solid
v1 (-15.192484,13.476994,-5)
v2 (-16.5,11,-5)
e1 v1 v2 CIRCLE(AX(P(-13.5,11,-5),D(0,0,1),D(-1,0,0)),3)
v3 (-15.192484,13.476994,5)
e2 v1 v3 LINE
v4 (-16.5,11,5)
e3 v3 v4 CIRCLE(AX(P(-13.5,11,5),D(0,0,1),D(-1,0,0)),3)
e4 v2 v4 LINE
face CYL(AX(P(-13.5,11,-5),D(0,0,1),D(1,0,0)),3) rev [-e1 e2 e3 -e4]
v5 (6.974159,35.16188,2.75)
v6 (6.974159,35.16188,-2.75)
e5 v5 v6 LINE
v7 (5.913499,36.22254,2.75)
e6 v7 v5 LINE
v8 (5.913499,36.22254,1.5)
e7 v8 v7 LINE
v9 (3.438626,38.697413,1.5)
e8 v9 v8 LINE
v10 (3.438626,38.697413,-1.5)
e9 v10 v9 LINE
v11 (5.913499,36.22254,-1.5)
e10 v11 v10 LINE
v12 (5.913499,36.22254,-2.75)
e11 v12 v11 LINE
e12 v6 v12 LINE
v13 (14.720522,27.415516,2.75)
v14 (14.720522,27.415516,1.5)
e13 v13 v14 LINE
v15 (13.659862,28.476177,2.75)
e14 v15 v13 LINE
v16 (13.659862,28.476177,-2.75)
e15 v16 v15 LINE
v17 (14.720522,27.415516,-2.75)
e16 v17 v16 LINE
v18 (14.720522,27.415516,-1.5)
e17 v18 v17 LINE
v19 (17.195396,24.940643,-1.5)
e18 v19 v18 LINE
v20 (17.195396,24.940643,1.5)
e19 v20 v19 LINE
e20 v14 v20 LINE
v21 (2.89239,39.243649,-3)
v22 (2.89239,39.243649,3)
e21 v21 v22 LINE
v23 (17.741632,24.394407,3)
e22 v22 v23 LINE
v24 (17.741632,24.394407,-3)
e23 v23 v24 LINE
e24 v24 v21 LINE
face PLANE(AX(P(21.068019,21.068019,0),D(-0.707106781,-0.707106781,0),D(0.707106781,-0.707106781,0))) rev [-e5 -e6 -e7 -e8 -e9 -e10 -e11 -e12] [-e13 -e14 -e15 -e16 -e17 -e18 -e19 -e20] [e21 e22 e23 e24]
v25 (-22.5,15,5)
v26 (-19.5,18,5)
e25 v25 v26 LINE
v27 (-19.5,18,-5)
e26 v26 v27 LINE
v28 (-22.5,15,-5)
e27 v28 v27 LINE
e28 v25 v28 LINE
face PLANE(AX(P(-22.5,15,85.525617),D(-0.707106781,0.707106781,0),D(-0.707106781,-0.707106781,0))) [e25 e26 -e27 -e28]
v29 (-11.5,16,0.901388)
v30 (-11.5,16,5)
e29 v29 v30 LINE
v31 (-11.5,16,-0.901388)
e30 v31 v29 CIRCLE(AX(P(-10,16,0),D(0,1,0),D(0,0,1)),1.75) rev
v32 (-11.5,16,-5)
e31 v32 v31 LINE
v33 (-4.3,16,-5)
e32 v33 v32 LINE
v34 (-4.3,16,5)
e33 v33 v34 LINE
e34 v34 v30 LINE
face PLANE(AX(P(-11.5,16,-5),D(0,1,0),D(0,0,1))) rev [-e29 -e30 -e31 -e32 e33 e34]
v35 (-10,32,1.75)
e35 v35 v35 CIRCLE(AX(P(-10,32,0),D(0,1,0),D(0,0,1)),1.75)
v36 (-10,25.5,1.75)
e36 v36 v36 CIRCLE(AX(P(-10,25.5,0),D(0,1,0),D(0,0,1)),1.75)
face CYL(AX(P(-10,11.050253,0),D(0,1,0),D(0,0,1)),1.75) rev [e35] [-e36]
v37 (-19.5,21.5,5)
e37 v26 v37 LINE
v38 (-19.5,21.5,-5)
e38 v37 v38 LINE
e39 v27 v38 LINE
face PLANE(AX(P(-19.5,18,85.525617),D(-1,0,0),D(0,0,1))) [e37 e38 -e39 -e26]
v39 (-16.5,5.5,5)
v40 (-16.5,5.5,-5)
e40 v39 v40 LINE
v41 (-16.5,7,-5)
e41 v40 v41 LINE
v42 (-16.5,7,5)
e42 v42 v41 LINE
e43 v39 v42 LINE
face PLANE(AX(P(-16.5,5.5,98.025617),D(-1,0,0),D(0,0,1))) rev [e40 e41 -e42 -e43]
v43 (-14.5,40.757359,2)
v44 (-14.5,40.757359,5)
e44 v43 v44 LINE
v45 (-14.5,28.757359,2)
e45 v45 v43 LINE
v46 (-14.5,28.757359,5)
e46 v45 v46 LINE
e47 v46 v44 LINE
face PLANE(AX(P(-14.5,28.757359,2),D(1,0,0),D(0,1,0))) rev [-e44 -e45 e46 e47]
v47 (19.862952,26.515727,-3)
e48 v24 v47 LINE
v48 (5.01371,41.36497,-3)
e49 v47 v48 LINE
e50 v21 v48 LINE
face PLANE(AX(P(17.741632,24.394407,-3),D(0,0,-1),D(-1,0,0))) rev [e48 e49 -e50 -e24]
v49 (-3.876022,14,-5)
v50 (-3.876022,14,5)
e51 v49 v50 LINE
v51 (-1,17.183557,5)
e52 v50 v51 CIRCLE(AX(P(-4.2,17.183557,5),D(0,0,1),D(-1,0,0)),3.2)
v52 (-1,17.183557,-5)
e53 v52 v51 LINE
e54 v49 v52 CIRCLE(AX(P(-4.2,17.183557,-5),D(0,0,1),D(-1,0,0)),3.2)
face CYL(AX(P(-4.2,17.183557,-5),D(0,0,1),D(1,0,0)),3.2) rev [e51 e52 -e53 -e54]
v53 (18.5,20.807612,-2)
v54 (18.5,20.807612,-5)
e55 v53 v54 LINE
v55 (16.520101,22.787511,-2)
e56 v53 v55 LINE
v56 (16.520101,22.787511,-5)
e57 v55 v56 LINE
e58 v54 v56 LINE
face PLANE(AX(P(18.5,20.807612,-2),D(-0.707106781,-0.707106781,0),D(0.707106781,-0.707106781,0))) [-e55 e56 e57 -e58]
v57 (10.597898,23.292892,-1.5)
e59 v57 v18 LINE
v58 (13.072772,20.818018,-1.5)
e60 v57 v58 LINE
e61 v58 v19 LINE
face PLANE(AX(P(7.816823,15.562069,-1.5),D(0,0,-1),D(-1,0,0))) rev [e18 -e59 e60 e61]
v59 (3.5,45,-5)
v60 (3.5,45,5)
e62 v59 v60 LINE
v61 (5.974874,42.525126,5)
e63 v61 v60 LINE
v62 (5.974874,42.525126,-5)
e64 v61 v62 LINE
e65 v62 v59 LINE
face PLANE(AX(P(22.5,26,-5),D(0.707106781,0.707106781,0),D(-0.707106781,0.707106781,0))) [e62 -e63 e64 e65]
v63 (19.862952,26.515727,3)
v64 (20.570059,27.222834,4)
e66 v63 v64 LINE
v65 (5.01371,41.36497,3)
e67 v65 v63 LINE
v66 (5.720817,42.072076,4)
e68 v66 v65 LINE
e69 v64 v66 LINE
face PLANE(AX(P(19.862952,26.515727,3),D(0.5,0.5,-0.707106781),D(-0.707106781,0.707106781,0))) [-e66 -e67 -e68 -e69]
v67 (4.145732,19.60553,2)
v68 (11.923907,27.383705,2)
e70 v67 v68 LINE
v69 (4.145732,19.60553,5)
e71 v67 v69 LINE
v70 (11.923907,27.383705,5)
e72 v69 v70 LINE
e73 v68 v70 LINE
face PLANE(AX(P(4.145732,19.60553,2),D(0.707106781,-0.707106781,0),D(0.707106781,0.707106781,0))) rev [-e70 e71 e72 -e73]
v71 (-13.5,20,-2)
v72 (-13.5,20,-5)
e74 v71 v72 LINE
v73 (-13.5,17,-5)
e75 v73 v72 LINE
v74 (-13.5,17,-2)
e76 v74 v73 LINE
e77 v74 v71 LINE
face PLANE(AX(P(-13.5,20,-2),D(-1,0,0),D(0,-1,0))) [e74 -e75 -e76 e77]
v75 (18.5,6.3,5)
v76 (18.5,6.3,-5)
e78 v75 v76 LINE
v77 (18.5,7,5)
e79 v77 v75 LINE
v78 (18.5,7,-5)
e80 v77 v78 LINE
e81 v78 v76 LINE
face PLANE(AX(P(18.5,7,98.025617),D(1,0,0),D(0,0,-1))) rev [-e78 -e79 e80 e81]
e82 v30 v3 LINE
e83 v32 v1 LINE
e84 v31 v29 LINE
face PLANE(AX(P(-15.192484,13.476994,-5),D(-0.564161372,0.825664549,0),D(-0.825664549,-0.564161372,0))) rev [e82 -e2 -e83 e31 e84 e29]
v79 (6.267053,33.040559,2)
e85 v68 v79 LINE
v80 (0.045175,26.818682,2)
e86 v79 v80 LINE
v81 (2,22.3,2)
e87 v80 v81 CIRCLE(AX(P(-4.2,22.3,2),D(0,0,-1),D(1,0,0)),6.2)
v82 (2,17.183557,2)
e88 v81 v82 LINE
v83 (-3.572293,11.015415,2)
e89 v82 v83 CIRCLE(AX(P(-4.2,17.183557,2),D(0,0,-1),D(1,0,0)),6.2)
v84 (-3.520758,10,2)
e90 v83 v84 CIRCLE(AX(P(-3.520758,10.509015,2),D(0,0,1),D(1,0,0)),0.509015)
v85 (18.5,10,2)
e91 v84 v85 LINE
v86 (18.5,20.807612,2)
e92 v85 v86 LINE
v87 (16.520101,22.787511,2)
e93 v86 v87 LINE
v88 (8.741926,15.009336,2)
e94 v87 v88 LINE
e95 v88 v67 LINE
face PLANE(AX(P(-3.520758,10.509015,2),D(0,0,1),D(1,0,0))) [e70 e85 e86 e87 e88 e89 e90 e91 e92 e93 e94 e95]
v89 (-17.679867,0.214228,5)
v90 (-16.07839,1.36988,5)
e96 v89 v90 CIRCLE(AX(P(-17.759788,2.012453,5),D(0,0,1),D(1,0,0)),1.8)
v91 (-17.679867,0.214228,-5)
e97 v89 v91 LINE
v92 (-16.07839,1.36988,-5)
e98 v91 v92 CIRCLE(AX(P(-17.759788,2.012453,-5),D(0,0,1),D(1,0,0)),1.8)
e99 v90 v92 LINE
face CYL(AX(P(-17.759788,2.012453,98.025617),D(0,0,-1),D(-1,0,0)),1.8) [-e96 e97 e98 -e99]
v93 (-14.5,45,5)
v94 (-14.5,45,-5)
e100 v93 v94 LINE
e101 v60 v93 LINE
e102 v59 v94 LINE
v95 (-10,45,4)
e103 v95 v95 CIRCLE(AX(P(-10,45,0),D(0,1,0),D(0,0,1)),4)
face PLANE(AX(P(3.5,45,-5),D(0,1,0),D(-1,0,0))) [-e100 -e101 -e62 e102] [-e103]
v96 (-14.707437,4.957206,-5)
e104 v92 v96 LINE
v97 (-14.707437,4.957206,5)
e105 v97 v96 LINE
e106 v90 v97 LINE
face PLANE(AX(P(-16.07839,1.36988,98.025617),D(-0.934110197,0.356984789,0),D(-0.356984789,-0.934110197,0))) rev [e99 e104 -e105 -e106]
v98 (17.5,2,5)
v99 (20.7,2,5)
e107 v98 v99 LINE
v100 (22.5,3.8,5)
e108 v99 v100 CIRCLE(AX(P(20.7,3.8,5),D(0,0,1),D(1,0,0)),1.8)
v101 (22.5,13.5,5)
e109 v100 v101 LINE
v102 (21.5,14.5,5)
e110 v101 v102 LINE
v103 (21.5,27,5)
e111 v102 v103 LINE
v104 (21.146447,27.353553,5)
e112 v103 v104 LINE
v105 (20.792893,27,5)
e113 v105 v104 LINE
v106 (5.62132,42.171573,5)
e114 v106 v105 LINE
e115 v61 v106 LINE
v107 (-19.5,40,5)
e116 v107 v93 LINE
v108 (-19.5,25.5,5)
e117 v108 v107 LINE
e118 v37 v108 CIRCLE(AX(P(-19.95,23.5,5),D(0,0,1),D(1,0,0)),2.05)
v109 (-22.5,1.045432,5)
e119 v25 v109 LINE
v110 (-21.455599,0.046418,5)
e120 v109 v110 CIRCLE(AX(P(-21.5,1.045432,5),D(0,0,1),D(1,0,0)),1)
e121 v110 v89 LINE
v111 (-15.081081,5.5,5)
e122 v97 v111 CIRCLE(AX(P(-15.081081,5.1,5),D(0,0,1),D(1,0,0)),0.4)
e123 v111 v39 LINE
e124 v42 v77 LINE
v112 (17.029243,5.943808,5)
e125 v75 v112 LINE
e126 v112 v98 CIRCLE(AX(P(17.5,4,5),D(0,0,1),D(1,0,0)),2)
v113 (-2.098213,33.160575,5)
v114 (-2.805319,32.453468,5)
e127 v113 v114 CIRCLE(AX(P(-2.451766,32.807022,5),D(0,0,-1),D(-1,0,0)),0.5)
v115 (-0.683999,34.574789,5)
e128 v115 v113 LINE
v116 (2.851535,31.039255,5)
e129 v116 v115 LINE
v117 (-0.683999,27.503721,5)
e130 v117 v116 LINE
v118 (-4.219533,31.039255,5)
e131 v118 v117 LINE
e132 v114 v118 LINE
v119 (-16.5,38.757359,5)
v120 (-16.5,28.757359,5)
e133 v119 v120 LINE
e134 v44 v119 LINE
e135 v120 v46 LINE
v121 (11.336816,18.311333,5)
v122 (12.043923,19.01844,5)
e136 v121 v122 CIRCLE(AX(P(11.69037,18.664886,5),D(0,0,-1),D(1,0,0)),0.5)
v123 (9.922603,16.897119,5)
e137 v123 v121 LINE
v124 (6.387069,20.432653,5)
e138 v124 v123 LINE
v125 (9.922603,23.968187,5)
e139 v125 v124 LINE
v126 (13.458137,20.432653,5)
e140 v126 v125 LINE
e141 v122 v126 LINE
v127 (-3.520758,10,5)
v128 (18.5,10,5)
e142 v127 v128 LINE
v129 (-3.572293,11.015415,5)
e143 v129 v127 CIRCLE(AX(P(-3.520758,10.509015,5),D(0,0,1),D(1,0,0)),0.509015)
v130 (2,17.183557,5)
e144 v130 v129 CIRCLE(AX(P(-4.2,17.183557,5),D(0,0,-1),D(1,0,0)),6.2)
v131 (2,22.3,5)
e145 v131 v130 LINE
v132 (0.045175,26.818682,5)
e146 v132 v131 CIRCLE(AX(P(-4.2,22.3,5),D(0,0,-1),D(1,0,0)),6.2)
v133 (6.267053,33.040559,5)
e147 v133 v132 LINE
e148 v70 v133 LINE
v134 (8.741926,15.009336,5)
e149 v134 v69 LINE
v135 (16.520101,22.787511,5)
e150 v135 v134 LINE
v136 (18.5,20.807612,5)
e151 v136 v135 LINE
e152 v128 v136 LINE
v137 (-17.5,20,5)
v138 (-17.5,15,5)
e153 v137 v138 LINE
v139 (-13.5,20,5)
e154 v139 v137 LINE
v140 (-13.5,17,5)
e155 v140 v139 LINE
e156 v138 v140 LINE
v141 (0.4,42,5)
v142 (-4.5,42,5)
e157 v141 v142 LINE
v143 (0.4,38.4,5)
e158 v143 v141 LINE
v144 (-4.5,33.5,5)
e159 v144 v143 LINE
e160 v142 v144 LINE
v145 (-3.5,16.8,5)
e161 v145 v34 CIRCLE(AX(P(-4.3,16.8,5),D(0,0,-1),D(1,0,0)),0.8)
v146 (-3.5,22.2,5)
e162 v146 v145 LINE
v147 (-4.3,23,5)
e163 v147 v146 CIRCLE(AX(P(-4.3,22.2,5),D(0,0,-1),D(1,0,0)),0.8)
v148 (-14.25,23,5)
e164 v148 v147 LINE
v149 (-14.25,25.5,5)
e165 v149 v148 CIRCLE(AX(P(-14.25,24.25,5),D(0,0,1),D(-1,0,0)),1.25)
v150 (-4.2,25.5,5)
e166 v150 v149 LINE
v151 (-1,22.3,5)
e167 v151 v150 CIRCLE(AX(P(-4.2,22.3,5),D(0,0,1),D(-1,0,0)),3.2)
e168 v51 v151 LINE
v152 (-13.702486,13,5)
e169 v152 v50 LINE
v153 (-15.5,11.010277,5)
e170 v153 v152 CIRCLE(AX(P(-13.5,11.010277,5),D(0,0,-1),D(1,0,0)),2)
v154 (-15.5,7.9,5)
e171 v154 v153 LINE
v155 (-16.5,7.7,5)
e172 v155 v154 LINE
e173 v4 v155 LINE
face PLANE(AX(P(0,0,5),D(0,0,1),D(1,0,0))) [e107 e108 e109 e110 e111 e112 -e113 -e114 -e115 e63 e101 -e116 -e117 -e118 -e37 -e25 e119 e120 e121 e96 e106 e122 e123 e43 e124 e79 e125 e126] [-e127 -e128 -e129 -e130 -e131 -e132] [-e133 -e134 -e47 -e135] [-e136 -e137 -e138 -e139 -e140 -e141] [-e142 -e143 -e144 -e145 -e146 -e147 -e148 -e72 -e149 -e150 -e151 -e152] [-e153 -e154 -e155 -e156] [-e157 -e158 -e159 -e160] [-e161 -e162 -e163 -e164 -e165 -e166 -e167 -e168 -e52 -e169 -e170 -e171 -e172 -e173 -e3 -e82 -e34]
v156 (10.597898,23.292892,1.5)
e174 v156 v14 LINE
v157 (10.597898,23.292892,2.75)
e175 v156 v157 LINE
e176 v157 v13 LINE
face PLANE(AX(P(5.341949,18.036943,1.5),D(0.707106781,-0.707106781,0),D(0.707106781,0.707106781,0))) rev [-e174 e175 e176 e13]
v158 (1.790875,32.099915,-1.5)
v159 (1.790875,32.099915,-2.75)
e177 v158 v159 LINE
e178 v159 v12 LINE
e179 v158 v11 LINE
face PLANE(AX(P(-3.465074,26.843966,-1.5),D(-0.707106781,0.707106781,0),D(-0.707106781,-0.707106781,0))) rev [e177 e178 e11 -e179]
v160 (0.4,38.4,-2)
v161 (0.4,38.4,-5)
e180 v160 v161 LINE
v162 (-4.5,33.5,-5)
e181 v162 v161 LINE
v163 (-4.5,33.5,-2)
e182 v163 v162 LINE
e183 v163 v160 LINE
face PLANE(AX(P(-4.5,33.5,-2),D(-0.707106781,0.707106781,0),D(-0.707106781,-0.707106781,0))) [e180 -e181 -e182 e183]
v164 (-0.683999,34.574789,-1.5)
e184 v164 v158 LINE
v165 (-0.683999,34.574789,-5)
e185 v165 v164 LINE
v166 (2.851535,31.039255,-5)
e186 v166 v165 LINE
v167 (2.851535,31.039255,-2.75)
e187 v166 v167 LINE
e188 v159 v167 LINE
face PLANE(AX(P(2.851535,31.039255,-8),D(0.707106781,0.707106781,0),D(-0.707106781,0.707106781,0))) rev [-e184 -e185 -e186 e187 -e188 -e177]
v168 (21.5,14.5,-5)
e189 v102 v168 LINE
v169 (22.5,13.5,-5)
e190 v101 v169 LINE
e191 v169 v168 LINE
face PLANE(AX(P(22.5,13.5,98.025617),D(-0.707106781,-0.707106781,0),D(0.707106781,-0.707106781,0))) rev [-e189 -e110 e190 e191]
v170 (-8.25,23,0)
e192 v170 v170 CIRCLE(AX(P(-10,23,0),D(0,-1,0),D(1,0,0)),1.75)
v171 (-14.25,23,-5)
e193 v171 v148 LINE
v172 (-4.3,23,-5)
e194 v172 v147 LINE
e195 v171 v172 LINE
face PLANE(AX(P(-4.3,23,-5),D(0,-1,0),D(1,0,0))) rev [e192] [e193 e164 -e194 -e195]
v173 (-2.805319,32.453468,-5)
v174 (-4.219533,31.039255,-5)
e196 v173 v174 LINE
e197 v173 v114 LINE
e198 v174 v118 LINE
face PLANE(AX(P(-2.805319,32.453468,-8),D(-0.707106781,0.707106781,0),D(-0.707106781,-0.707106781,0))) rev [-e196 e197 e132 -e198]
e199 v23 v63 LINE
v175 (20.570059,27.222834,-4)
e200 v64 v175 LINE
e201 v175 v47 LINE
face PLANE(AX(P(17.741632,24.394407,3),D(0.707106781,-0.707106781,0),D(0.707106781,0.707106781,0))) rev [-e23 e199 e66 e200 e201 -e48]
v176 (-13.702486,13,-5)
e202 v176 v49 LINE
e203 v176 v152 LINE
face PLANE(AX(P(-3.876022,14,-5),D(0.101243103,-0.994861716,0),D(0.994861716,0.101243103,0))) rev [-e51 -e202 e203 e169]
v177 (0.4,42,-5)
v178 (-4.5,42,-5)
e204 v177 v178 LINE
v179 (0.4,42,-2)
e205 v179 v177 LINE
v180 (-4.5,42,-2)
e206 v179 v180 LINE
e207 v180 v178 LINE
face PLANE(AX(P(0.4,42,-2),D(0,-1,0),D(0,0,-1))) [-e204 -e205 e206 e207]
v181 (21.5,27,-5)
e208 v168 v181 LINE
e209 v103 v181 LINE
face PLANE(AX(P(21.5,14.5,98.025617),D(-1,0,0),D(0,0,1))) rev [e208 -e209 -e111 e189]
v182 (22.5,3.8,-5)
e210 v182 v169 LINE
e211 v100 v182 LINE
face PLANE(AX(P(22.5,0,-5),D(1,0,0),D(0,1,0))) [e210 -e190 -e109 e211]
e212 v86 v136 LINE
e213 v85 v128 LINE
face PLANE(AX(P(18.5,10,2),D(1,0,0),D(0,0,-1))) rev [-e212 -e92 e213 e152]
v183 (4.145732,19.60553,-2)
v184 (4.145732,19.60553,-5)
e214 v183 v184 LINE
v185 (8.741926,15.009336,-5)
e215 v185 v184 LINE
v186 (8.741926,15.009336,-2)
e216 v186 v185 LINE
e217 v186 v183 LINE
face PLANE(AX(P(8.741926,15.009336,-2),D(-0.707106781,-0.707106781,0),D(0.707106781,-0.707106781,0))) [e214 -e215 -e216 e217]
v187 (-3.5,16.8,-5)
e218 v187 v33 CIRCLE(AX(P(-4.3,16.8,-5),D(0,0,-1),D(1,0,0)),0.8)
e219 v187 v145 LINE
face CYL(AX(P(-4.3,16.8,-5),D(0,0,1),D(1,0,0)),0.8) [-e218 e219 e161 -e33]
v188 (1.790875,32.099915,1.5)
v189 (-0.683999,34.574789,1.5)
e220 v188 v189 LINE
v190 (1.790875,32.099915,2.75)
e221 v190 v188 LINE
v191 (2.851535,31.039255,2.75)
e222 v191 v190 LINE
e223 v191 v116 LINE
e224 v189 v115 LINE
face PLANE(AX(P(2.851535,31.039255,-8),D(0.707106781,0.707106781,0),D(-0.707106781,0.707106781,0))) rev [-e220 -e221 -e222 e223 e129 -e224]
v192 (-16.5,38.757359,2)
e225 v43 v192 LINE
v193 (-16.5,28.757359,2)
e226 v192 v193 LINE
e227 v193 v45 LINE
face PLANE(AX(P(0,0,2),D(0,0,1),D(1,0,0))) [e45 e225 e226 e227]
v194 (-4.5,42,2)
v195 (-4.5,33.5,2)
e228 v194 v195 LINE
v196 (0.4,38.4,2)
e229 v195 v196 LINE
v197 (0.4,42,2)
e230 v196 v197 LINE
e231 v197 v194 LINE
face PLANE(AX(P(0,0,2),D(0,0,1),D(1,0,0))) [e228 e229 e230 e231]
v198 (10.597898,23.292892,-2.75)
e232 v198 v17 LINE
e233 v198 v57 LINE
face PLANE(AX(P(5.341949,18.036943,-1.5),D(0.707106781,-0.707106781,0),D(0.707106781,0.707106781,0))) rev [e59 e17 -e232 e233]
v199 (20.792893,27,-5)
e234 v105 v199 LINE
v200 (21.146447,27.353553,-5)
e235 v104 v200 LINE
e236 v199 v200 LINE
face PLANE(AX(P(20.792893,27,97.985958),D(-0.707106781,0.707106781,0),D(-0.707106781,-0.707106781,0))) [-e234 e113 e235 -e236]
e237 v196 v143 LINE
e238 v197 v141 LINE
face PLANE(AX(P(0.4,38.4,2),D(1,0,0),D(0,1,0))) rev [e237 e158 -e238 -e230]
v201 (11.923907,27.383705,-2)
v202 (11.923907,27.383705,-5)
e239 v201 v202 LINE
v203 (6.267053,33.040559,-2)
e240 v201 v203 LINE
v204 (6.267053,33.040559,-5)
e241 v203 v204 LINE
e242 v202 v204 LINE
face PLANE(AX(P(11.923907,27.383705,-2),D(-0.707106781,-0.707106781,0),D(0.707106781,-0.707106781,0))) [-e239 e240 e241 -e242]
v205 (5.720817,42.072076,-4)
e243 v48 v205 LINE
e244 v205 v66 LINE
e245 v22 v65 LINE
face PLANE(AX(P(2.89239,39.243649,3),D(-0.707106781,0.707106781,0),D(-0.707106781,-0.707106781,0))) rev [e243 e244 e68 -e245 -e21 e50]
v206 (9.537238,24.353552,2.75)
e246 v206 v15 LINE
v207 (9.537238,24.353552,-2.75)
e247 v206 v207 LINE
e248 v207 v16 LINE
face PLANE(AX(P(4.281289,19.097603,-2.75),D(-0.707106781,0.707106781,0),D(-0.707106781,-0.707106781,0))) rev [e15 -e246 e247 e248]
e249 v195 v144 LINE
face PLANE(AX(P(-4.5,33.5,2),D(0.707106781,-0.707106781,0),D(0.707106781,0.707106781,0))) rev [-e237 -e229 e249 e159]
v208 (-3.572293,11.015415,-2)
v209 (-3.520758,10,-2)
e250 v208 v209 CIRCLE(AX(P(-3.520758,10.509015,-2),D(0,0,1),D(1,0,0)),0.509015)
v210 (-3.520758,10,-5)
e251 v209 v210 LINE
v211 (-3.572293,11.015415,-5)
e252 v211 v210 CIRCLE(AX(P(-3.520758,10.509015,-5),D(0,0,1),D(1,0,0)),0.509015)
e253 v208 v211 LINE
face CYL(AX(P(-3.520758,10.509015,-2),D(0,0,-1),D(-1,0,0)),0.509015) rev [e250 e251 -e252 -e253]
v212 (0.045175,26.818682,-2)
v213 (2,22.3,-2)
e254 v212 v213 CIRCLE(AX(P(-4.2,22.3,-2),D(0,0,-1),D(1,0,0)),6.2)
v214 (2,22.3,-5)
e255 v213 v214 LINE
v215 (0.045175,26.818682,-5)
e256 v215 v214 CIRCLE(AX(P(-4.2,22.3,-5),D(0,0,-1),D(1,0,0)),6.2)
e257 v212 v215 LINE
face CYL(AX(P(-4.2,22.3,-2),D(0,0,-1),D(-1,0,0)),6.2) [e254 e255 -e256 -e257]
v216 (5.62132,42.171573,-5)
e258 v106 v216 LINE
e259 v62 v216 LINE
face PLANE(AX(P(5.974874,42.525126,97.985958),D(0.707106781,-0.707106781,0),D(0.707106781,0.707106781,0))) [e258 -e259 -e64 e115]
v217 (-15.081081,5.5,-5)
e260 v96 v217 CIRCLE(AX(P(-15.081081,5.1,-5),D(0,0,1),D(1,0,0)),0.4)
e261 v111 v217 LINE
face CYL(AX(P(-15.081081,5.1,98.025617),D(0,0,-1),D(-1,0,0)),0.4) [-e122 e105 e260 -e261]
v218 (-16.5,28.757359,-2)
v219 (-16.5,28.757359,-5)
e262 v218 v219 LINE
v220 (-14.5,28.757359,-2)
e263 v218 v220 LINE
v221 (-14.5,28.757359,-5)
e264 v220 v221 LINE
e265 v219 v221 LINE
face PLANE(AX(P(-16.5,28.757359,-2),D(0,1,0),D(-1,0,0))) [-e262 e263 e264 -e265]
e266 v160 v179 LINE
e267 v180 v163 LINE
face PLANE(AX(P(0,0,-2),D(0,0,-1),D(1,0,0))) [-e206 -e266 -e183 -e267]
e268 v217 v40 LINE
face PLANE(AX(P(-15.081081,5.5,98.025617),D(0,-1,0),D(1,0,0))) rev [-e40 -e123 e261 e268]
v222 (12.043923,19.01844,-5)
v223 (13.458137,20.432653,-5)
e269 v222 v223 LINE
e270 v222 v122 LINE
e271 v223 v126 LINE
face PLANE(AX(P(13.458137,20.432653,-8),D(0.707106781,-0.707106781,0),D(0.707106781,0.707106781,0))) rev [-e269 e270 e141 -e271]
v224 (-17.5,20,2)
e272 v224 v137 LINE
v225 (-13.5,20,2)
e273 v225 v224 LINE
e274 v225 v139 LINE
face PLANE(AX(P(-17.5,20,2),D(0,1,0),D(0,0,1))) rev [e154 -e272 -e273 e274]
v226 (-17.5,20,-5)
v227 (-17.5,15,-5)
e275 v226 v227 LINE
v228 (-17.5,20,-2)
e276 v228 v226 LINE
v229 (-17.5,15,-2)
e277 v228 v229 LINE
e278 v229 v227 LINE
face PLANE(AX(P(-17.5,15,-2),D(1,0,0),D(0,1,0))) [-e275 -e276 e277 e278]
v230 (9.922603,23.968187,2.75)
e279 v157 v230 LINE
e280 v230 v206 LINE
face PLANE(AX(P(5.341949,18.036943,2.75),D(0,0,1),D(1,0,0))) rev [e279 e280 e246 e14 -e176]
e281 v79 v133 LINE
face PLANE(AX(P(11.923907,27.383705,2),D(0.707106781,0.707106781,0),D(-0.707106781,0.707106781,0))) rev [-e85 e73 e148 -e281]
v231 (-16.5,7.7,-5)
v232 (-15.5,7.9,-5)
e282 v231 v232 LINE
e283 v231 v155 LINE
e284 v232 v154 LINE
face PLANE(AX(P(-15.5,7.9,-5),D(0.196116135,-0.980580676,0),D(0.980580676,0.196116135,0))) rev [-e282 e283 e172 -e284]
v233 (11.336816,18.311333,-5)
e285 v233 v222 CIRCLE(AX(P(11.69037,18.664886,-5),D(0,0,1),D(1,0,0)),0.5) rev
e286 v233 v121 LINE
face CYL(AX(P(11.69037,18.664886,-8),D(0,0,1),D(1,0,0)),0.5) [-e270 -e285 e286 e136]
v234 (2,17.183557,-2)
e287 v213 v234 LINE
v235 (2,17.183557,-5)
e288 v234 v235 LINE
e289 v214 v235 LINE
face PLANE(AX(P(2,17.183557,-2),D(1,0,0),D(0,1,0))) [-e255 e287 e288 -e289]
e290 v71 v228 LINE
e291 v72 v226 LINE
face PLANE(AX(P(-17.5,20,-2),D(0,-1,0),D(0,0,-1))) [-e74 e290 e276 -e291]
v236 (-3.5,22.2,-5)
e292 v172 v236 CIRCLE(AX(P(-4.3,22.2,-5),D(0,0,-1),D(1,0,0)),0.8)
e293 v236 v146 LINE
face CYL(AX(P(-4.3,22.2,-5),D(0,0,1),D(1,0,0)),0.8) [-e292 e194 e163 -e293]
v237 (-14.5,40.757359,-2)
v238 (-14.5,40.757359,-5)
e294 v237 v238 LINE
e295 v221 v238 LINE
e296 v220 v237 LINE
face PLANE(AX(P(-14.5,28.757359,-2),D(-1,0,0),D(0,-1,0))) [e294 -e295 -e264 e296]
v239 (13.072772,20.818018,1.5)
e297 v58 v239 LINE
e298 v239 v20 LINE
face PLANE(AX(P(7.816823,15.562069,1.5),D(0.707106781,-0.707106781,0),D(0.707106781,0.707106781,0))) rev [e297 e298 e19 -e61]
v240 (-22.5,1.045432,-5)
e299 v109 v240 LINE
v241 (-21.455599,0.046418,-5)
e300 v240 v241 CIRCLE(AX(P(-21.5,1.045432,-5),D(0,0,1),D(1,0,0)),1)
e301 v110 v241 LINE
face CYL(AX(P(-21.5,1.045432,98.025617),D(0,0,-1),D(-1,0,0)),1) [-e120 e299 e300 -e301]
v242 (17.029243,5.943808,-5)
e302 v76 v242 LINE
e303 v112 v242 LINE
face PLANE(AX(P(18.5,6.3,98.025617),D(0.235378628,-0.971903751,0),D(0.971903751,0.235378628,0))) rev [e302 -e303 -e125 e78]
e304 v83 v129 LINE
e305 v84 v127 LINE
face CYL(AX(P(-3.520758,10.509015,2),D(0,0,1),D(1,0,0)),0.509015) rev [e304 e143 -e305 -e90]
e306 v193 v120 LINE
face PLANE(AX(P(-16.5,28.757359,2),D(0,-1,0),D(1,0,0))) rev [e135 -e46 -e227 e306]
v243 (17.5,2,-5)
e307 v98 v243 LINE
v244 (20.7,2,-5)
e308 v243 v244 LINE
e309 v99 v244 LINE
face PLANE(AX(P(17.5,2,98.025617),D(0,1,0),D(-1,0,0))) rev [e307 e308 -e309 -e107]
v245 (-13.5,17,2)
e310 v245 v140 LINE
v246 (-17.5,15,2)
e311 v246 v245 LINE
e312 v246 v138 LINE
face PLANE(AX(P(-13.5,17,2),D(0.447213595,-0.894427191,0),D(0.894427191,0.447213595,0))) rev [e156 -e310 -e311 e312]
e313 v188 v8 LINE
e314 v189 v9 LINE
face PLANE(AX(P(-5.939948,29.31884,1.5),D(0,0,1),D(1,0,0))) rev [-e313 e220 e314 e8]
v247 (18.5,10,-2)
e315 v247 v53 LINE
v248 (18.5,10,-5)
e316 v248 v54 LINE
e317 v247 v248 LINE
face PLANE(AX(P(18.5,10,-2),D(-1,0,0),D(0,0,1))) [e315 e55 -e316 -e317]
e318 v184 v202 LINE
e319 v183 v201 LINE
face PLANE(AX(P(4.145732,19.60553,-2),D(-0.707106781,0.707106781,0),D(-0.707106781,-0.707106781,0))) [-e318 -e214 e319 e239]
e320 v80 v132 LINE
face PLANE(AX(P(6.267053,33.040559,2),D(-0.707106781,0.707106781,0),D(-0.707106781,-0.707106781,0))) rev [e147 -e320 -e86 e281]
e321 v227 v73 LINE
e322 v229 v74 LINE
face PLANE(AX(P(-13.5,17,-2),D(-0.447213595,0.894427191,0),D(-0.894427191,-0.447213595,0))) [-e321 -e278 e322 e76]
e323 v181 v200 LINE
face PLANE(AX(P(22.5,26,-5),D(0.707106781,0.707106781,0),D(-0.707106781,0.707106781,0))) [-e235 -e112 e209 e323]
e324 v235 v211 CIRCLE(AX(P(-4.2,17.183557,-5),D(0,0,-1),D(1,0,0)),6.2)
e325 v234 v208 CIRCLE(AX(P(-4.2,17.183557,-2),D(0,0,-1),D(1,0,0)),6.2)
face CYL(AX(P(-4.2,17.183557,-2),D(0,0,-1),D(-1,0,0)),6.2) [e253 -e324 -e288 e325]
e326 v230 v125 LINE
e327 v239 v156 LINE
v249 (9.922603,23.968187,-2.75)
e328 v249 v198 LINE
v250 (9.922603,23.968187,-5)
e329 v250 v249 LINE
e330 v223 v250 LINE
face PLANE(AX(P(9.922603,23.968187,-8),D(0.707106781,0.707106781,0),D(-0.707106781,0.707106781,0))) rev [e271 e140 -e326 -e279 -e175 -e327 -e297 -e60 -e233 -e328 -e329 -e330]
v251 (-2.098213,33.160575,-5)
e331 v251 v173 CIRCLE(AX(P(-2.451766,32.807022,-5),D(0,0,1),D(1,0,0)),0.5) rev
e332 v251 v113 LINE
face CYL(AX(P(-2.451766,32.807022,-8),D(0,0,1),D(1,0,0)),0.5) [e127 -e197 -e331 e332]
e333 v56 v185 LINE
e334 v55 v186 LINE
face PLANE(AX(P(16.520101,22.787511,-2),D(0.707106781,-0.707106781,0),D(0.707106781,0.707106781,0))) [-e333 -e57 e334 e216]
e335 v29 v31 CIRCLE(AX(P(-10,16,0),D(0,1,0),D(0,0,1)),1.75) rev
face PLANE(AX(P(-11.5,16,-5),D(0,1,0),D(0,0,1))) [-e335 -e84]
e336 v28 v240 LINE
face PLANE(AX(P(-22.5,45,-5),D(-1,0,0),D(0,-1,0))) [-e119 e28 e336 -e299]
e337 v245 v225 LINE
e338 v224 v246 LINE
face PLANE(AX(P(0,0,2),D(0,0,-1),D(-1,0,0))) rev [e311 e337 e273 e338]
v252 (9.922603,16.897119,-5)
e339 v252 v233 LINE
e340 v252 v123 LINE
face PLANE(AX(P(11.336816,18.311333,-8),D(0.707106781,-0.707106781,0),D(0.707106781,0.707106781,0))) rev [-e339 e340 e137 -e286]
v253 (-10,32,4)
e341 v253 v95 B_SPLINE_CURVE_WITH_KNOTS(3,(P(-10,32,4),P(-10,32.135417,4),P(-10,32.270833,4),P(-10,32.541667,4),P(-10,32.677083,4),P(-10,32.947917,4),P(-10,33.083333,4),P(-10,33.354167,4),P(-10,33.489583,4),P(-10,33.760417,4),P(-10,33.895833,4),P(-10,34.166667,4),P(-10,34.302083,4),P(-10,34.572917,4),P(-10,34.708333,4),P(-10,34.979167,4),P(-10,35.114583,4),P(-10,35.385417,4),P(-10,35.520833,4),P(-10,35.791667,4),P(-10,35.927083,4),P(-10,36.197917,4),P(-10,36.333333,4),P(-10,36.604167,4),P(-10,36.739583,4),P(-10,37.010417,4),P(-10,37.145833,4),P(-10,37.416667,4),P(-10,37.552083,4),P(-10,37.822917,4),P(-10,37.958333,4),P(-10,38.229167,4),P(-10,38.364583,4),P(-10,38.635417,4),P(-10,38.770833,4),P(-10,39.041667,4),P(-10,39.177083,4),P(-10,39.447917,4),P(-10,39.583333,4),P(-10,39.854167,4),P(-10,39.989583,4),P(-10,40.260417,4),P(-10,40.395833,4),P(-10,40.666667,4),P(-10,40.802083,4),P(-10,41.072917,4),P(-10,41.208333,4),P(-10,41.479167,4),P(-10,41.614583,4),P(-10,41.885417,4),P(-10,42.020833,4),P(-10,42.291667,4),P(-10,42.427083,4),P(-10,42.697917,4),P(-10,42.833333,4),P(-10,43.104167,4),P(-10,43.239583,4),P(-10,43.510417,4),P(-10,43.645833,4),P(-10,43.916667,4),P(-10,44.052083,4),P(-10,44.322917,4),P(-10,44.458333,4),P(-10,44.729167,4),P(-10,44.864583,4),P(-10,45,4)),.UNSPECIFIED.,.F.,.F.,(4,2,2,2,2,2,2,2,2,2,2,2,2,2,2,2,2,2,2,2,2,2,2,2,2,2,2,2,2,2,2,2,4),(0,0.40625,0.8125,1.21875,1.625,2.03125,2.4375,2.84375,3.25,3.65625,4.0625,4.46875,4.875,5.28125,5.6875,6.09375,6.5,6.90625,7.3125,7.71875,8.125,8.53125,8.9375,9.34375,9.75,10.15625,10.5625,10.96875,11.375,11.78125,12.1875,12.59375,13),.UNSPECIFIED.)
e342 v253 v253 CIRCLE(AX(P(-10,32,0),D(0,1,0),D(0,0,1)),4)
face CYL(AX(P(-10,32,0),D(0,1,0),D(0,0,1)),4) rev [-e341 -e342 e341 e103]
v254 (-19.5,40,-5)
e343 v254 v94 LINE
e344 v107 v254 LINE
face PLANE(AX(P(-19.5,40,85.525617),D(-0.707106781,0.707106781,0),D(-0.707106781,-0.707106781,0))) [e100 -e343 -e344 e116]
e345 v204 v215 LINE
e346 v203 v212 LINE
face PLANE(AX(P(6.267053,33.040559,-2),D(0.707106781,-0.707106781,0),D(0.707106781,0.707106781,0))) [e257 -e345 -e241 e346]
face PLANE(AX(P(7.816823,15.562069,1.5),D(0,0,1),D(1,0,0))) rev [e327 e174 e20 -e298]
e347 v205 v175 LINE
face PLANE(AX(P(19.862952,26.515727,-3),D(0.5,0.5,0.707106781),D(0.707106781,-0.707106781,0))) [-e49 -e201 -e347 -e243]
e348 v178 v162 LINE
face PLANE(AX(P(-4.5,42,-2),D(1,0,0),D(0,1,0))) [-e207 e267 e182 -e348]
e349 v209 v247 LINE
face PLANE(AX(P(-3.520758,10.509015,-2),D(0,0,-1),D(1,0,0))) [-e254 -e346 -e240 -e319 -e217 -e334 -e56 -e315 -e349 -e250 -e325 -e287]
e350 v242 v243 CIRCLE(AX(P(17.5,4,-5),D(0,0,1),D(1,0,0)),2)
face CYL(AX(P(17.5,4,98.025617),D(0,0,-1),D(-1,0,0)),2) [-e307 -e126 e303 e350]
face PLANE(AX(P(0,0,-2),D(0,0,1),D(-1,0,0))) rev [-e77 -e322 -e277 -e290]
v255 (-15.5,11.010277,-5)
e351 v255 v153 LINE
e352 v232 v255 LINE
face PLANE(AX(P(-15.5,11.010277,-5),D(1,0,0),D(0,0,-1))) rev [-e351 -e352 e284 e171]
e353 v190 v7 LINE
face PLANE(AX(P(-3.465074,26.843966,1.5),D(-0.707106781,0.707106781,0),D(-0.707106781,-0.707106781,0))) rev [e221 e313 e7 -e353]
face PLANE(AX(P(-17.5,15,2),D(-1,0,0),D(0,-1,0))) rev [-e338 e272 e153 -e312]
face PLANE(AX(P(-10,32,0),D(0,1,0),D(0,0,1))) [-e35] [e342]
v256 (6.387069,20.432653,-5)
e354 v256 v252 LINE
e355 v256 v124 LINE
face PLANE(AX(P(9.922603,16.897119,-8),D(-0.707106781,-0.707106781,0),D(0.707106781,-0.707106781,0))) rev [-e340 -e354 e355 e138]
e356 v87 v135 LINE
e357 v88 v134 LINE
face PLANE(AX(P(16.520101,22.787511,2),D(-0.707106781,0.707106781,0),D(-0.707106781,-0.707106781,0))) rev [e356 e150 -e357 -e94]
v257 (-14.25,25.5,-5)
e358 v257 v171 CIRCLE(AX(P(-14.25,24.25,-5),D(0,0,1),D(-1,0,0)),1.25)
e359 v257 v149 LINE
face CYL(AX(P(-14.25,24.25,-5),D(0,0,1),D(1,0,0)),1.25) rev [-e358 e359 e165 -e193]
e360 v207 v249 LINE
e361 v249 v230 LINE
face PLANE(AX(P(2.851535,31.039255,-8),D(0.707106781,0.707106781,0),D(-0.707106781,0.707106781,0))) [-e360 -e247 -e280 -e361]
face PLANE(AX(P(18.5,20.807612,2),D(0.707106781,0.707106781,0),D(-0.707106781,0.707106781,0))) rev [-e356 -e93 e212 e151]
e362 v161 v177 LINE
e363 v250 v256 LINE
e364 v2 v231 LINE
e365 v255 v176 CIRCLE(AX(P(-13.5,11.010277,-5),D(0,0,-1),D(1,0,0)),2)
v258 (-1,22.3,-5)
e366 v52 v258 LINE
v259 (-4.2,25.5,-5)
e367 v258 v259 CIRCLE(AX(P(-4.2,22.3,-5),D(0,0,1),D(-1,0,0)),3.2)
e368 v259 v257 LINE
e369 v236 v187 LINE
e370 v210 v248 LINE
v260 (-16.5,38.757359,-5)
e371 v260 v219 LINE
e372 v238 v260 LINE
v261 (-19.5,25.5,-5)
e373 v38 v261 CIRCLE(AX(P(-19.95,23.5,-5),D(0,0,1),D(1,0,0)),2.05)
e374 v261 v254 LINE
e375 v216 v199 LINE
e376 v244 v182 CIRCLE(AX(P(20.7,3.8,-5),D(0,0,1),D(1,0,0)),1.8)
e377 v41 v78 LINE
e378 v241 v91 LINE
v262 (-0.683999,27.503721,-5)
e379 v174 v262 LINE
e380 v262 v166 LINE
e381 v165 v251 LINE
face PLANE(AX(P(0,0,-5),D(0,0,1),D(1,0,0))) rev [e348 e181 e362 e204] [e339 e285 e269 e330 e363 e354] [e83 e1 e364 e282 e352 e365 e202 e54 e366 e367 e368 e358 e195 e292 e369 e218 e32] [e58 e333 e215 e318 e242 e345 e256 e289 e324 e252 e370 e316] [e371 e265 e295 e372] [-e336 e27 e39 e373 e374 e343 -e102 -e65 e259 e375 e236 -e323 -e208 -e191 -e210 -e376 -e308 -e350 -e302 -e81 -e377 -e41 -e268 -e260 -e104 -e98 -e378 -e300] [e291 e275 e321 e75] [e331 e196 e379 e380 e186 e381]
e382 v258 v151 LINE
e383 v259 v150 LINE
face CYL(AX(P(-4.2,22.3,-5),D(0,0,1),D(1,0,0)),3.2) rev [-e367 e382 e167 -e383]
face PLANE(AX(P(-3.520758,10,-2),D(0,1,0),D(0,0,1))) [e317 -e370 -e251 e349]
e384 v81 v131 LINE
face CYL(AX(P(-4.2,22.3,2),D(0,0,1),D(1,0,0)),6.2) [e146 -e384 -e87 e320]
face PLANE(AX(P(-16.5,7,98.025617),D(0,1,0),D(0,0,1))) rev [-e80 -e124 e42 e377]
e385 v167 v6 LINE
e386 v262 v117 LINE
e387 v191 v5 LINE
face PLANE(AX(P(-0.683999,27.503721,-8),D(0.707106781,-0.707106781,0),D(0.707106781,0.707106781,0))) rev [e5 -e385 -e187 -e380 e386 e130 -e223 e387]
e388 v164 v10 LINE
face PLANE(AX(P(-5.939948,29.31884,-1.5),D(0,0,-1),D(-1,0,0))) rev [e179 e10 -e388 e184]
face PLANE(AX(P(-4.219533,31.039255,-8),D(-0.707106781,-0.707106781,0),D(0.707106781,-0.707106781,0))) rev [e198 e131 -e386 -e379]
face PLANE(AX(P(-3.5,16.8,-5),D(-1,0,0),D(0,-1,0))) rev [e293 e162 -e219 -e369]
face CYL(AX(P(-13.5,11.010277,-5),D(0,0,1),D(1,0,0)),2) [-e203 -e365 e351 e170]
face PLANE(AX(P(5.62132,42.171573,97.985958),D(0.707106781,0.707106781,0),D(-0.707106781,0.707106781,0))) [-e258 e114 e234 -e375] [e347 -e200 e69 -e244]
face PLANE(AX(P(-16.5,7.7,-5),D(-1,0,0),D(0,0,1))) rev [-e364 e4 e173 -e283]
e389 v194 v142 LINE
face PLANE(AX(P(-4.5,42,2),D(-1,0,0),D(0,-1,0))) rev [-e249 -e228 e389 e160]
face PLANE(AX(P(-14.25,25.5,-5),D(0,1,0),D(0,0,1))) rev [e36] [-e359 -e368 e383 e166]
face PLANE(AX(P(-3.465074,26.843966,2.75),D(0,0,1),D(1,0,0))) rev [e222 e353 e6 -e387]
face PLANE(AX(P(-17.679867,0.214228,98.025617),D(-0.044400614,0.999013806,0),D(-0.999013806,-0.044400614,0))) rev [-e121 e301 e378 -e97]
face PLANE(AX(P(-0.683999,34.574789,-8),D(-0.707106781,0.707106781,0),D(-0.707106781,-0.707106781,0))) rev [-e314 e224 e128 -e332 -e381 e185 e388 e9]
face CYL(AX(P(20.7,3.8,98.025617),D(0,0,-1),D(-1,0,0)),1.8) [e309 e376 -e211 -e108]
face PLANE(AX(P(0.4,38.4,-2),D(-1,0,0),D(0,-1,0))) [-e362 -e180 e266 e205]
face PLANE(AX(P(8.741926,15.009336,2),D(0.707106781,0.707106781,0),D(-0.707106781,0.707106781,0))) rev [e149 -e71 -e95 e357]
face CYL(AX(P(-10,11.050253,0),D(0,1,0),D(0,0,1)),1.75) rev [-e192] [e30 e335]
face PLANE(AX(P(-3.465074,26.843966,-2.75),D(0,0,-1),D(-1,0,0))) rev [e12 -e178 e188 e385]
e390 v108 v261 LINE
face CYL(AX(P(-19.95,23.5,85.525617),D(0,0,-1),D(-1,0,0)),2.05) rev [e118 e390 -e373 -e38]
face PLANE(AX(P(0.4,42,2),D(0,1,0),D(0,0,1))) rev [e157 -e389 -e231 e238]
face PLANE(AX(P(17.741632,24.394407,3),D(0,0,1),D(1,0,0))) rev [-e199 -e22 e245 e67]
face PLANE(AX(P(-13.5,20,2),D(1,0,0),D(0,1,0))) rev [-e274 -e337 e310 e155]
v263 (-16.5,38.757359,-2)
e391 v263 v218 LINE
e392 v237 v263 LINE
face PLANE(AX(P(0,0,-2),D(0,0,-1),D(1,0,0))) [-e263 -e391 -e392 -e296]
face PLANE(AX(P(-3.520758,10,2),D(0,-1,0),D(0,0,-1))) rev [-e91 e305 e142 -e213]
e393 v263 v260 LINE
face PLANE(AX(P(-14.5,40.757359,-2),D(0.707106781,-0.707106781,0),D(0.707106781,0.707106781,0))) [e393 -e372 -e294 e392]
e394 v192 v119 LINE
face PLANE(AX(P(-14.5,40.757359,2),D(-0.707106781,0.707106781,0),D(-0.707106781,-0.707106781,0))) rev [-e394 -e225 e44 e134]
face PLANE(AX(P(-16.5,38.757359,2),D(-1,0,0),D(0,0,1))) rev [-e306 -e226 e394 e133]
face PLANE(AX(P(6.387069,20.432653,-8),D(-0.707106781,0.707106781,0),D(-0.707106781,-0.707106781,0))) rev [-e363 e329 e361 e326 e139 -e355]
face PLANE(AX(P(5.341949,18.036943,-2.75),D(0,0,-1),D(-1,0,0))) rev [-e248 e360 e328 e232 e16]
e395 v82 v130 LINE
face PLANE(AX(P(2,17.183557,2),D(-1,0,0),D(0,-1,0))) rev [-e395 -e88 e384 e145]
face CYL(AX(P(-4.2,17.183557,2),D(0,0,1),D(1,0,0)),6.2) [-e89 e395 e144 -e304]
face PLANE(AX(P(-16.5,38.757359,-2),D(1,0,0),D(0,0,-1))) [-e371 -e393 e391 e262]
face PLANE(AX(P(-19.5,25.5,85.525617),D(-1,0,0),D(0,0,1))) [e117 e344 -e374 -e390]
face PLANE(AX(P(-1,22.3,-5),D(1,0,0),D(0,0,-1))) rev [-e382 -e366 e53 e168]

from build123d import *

# Parameters (mm, degrees)
BOSS_EXTRUDE1_DEPTH     = 5
CUT_EXTRUDE1_DEPTH      = 52.295711322
CUT_EXTRUDE1_DEPTH_BACK = 10
CUT_EXTRUDE3_START      = -10
CUT_EXTRUDE3_DEPTH      = 10
CUT_EXTRUDE4_DEPTH      = 52.295711322
CUT_EXTRUDE4_DEPTH_BACK = 10
CUT_EXTRUDE5_DEPTH      = 10
CUT_EXTRUDE6_DEPTH      = 3
SKETCH9_R               = 4
CUT_EXTRUDE7_DEPTH      = 13
CUT_EXTRUDE8_REACH      = 41.4
SKETCH10_R              = 1.75
CUT_EXTRUDE9_DEPTH      = 13
SKETCH12_W              = 6
SKETCH12_H              = 21
CUT_EXTRUDE10_DEPTH     = 4
CUT_EXTRUDE11_DEPTH     = 5.830271703
CHAMFER1_SIZE           = 1


# Read off the part's stored shape, not the designer's step: Cut-Extrude3
with BuildPart() as part:
    # Sketch1 → Boss-Extrude1 (new, symmetric)
    with BuildSketch(Plane.XY):
        Polygon((-22.5, 45), (-22.5, 0), (22.5, 0), (22.5, 26), (3.5, 45), align=None)
    extrude(amount=BOSS_EXTRUDE1_DEPTH, both=True)

    # Sketch2 → Cut-Extrude1 (cut, two sides: drawn at the far end of the back side and taken through both)
    with BuildSketch(Plane.XY.offset(5).offset(-CUT_EXTRUDE1_DEPTH_BACK)):
        with BuildLine():
            Line((-111.960387508, -74.460387508), (-22.5, 15))
            Line((-22.5, 15), (-19.5, 18))
            Line((-19.5, 18), (-19.5, 21.5))
            ThreePointArc((-19.5, 21.5), (-17.9, 23.5), (-19.5, 25.5))
            Line((-19.5, 25.5), (-19.5, 40))
            Line((-19.5, 40), (-14.5, 45))
            Line((-14.5, 45), (74.960387508, 134.460387508))
            Line((74.960387508, 134.460387508), (-113.613392046, 303.176768247))
            Line((-113.613392046, 303.176768247), (-300.534167062, 94.255993231))
            Line((-300.534167062, 94.255993231), (-111.960387508, -74.460387508))
        make_face()
    extrude(amount=CUT_EXTRUDE1_DEPTH + CUT_EXTRUDE1_DEPTH_BACK, mode=Mode.SUBTRACT)

    # Cut-Extrude3 outline → Cut-Extrude3 (cut)
    with BuildSketch(Plane.XY.offset(5).offset(CUT_EXTRUDE3_START)):
        Polygon((21.5, 27), (21.5, 14.5), (22.5, 13.5), (22.5, 26), align=None)
        with BuildLine():
            Line((22.5, 0), (22.5, 3.8))
            ThreePointArc((22.5, 3.8), (21.972792206, 2.527207794), (20.7, 2))
            Line((20.7, 2), (17.5, 2))
            ThreePointArc((17.5, 2), (15.514097811, 3.762950432), (17.029242744, 5.943807502))
            Line((17.029242744, 5.943807502), (18.5, 6.3))
            Line((18.5, 6.3), (18.5, 7))
            Line((18.5, 7), (-16.5, 7))
            Line((-16.5, 7), (-16.5, 5.5))
            Line((-16.5, 5.5), (-15.081081244, 5.5))
            ThreePointArc((-15.081081244, 5.5), (-14.751598645, 5.326806563), (-14.707437165, 4.957206084))
            Line((-14.707437165, 4.957206084), (-16.078389668, 1.369880369))
            ThreePointArc((-16.078389668, 1.369880369), (-16.706486271, 0.552810765), (-17.679866918, 0.214228137))
            Line((-17.679866918, 0.214228137), (-21.455599386, 0.046417805))
            ThreePointArc((-21.455599386, 0.046417805), (-22.191230564, 0.322797329), (-22.5, 1.045431612))
            Line((-22.5, 1.045431612), (-22.5, 0))
            Line((-22.5, 0), (22.5, 0))
        make_face()
    extrude(amount=CUT_EXTRUDE3_DEPTH, mode=Mode.SUBTRACT)

    # Sketch3 → Cut-Extrude4 (cut, two sides: drawn at the far end of the back side and taken through both)
    with BuildSketch(Plane.XY.offset(5).offset(-CUT_EXTRUDE4_DEPTH_BACK)):
        Polygon((85.857284299, 122.40753683), (5.974873734, 42.525126266), (5.621320344, 42.171572875), (20.792893219, 27), (21.146446609, 27.353553391), (101.028857174, 107.235963955), (260.793678303, 267.000785084), (245.622105428, 282.17235796), align=None)
    extrude(amount=CUT_EXTRUDE4_DEPTH + CUT_EXTRUDE4_DEPTH_BACK, mode=Mode.SUBTRACT)

    # Sketch7 → Cut-Extrude5 (cut)
    with BuildSketch(Plane.XY.offset(5)):
        with BuildLine():
            Line((-16.5, 7.7), (-16.5, 11))
            ThreePointArc((-16.5, 11), (-16.153059775, 12.400454865), (-15.192484115, 13.476993646))
            Line((-15.192484115, 13.476993646), (-11.5, 16))
            Line((-11.5, 16), (-4.3, 16))
            ThreePointArc((-4.3, 16), (-3.734314575, 16.234314575), (-3.5, 16.8))
            Line((-3.5, 16.8), (-3.5, 22.2))
            ThreePointArc((-3.5, 22.2), (-3.734314575, 22.765685425), (-4.3, 23))
            Line((-4.3, 23), (-14.25, 23))
            ThreePointArc((-14.25, 23), (-15.5, 24.25), (-14.25, 25.5))
            Line((-14.25, 25.5), (-4.2, 25.5))
            ThreePointArc((-4.2, 25.5), (-1.9372583, 24.5627417), (-1, 22.3))
            Line((-1, 22.3), (-1, 17.183557492))
            ThreePointArc((-1, 17.183557492), (-1.825475903, 15.038415232), (-3.876022072, 14))
            Line((-3.876022072, 14), (-13.702486205, 13))
            ThreePointArc((-13.702486205, 13), (-14.98407756, 12.35099048), (-15.5, 11.010276568))
            Line((-15.5, 11.010276568), (-15.5, 7.9))
            Line((-15.5, 7.9), (-16.5, 7.7))
        make_face()
    extrude(amount=-CUT_EXTRUDE5_DEPTH, mode=Mode.SUBTRACT)

    # Sketch8 → Cut-Extrude6 (cut)
    with BuildSketch(Plane.XY.offset(5)):
        Polygon((-17.5, 20), (-13.5, 20), (-13.5, 17), (-17.5, 15), align=None)
        Polygon((-16.5, 38.757359313), (-16.5, 28.757359313), (-14.5, 28.757359313), (-14.5, 40.757359313), align=None)
        Polygon((0.4, 42), (-4.5, 42), (-4.5, 33.5), (0.4, 38.4), align=None)
        with BuildLine():
            Line((-3.52075849, 10), (18.5, 10))
            Line((18.5, 10), (18.5, 20.807611845))
            Line((18.5, 20.807611845), (16.520101013, 22.787510832))
            Line((16.520101013, 22.787510832), (8.74192642, 15.009336239))
            Line((8.74192642, 15.009336239), (4.145732342, 19.605530317))
            Line((4.145732342, 19.605530317), (11.923906935, 27.38370491))
            Line((11.923906935, 27.38370491), (6.267052685, 33.040559159))
            Line((6.267052685, 33.040559159), (0.045175397, 26.818681871))
            ThreePointArc((0.045175397, 26.818681871), (1.490346539, 24.761697843), (2, 22.3))
            Line((2, 22.3), (2, 17.183557492))
            ThreePointArc((2, 17.183557492), (0.400640437, 13.027344363), (-3.572292764, 11.015414852))
            ThreePointArc((-3.572292764, 11.015414852), (-4.029119362, 10.483214857), (-3.52075849, 10))
        make_face()
    cut_extrude6 = extrude(amount=-CUT_EXTRUDE6_DEPTH, mode=Mode.SUBTRACT)

    # Mirror1: Cut-Extrude6 across plane
    add(cut_extrude6.mirror(Plane.XY), mode=Mode.SUBTRACT)

    # Sketch9 → Cut-Extrude7 (cut)
    with BuildSketch(Plane(origin=(0, 45, 0), x_dir=(1, 0, 0), z_dir=(0, 1, 0))):
        with Locations(Location((-10, 0, 0), (0, 0, 270))):
            Circle(SKETCH9_R)
    extrude(amount=-CUT_EXTRUDE7_DEPTH, mode=Mode.SUBTRACT)

    # Cut-Extrude8: up to this face of the body (flat: up to its plane)
    cut_extrude8_end = Plane(part.part.faces().sort_by_distance((-7.9, 16, 0))[0])
    # Sketch10 → Cut-Extrude8 (cut, up to the picked face)
    with BuildSketch(Plane(origin=(0, 32, 0), x_dir=(1, 0, 0), z_dir=(0, 1, 0)), mode=Mode.PRIVATE) as cut_extrude8_sk1:
        with Locations(Location((-10, 0, 0), (0, 0, 270))):
            Circle(SKETCH10_R)
    cut_extrude8_tool1 = split(extrude(cut_extrude8_sk1.sketch, amount=-CUT_EXTRUDE8_REACH, mode=Mode.PRIVATE), bisect_by=cut_extrude8_end, keep=Keep.BOTH, mode=Mode.PRIVATE)
    add(cut_extrude8_tool1.solids().sort_by(Axis((-10, 32, 0), (0, -1, 0)))[0], mode=Mode.SUBTRACT)

    # Sketch11 → Cut-Extrude9 (cut)
    with BuildSketch(Plane.XY.offset(5)):
        with BuildLine():
            Line((-4.219533003, 31.039254845), (-0.683999097, 27.503720939))
            Line((-0.683999097, 27.503720939), (2.851534809, 31.039254845))
            Line((2.851534809, 31.039254845), (-0.683999097, 34.574788751))
            Line((-0.683999097, 34.574788751), (-2.098212659, 33.160575189))
            ThreePointArc((-2.098212659, 33.160575189), (-2.098212659, 32.453468408), (-2.80531944, 32.453468408))
            Line((-2.80531944, 32.453468408), (-4.219533003, 31.039254845))
        make_face()
        with BuildLine():
            Line((11.336816184, 18.311332784), (9.922602621, 16.897119222))
            Line((9.922602621, 16.897119222), (6.387068715, 20.432653128))
            Line((6.387068715, 20.432653128), (9.922602621, 23.968187033))
            Line((9.922602621, 23.968187033), (13.458136527, 20.432653128))
            Line((13.458136527, 20.432653128), (12.043922965, 19.018439565))
            ThreePointArc((12.043922965, 19.018439565), (11.336816184, 19.018439565), (11.336816184, 18.311332784))
        make_face()
    extrude(amount=-CUT_EXTRUDE9_DEPTH, mode=Mode.SUBTRACT)

    # Sketch12 → Cut-Extrude10 (cut)
    with BuildSketch(Plane(origin=(23.896446609, 23.896446609, 0), x_dir=(0, 0, -1), z_dir=(0.7071067811865471, 0.7071067811865479, 0))):
        with Locations((0, 15.204222165)):
            Rectangle(SKETCH12_W, SKETCH12_H)
    extrude(amount=-CUT_EXTRUDE10_DEPTH, mode=Mode.SUBTRACT)

    # Sketch13 → Cut-Extrude11 (cut)
    with BuildSketch(Plane(origin=(21.068019485, 21.068019485, 0), x_dir=(0, 0, -1), z_dir=(0.7071067811865471, 0.7071067811865479, 0))):
        Polygon((-1.5, 24.931727984), (1.5, 24.931727984), (1.5, 21.431727984), (2.75, 21.431727984), (2.75, 19.931727984), (-2.75, 19.931727984), (-2.75, 21.431727984), (-1.5, 21.431727984), align=None)
        Polygon((-1.5, 5.476716347), (-1.5, 8.976716347), (-2.75, 8.976716347), (-2.75, 10.476716347), (2.75, 10.476716347), (2.75, 8.976716347), (1.5, 8.976716347), (1.5, 5.476716347), align=None)
    extrude(amount=-CUT_EXTRUDE11_DEPTH, mode=Mode.SUBTRACT)

    # Chamfer1
    chamfer1_edges = [part.edges().sort_by_distance(p)[0] for p in [
        (13.145438014, 34.647455205, -3),
        (13.145438014, 34.647455205, 3),
    ]]
    chamfer(chamfer1_edges, length=CHAMFER1_SIZE)


solid = part.part
